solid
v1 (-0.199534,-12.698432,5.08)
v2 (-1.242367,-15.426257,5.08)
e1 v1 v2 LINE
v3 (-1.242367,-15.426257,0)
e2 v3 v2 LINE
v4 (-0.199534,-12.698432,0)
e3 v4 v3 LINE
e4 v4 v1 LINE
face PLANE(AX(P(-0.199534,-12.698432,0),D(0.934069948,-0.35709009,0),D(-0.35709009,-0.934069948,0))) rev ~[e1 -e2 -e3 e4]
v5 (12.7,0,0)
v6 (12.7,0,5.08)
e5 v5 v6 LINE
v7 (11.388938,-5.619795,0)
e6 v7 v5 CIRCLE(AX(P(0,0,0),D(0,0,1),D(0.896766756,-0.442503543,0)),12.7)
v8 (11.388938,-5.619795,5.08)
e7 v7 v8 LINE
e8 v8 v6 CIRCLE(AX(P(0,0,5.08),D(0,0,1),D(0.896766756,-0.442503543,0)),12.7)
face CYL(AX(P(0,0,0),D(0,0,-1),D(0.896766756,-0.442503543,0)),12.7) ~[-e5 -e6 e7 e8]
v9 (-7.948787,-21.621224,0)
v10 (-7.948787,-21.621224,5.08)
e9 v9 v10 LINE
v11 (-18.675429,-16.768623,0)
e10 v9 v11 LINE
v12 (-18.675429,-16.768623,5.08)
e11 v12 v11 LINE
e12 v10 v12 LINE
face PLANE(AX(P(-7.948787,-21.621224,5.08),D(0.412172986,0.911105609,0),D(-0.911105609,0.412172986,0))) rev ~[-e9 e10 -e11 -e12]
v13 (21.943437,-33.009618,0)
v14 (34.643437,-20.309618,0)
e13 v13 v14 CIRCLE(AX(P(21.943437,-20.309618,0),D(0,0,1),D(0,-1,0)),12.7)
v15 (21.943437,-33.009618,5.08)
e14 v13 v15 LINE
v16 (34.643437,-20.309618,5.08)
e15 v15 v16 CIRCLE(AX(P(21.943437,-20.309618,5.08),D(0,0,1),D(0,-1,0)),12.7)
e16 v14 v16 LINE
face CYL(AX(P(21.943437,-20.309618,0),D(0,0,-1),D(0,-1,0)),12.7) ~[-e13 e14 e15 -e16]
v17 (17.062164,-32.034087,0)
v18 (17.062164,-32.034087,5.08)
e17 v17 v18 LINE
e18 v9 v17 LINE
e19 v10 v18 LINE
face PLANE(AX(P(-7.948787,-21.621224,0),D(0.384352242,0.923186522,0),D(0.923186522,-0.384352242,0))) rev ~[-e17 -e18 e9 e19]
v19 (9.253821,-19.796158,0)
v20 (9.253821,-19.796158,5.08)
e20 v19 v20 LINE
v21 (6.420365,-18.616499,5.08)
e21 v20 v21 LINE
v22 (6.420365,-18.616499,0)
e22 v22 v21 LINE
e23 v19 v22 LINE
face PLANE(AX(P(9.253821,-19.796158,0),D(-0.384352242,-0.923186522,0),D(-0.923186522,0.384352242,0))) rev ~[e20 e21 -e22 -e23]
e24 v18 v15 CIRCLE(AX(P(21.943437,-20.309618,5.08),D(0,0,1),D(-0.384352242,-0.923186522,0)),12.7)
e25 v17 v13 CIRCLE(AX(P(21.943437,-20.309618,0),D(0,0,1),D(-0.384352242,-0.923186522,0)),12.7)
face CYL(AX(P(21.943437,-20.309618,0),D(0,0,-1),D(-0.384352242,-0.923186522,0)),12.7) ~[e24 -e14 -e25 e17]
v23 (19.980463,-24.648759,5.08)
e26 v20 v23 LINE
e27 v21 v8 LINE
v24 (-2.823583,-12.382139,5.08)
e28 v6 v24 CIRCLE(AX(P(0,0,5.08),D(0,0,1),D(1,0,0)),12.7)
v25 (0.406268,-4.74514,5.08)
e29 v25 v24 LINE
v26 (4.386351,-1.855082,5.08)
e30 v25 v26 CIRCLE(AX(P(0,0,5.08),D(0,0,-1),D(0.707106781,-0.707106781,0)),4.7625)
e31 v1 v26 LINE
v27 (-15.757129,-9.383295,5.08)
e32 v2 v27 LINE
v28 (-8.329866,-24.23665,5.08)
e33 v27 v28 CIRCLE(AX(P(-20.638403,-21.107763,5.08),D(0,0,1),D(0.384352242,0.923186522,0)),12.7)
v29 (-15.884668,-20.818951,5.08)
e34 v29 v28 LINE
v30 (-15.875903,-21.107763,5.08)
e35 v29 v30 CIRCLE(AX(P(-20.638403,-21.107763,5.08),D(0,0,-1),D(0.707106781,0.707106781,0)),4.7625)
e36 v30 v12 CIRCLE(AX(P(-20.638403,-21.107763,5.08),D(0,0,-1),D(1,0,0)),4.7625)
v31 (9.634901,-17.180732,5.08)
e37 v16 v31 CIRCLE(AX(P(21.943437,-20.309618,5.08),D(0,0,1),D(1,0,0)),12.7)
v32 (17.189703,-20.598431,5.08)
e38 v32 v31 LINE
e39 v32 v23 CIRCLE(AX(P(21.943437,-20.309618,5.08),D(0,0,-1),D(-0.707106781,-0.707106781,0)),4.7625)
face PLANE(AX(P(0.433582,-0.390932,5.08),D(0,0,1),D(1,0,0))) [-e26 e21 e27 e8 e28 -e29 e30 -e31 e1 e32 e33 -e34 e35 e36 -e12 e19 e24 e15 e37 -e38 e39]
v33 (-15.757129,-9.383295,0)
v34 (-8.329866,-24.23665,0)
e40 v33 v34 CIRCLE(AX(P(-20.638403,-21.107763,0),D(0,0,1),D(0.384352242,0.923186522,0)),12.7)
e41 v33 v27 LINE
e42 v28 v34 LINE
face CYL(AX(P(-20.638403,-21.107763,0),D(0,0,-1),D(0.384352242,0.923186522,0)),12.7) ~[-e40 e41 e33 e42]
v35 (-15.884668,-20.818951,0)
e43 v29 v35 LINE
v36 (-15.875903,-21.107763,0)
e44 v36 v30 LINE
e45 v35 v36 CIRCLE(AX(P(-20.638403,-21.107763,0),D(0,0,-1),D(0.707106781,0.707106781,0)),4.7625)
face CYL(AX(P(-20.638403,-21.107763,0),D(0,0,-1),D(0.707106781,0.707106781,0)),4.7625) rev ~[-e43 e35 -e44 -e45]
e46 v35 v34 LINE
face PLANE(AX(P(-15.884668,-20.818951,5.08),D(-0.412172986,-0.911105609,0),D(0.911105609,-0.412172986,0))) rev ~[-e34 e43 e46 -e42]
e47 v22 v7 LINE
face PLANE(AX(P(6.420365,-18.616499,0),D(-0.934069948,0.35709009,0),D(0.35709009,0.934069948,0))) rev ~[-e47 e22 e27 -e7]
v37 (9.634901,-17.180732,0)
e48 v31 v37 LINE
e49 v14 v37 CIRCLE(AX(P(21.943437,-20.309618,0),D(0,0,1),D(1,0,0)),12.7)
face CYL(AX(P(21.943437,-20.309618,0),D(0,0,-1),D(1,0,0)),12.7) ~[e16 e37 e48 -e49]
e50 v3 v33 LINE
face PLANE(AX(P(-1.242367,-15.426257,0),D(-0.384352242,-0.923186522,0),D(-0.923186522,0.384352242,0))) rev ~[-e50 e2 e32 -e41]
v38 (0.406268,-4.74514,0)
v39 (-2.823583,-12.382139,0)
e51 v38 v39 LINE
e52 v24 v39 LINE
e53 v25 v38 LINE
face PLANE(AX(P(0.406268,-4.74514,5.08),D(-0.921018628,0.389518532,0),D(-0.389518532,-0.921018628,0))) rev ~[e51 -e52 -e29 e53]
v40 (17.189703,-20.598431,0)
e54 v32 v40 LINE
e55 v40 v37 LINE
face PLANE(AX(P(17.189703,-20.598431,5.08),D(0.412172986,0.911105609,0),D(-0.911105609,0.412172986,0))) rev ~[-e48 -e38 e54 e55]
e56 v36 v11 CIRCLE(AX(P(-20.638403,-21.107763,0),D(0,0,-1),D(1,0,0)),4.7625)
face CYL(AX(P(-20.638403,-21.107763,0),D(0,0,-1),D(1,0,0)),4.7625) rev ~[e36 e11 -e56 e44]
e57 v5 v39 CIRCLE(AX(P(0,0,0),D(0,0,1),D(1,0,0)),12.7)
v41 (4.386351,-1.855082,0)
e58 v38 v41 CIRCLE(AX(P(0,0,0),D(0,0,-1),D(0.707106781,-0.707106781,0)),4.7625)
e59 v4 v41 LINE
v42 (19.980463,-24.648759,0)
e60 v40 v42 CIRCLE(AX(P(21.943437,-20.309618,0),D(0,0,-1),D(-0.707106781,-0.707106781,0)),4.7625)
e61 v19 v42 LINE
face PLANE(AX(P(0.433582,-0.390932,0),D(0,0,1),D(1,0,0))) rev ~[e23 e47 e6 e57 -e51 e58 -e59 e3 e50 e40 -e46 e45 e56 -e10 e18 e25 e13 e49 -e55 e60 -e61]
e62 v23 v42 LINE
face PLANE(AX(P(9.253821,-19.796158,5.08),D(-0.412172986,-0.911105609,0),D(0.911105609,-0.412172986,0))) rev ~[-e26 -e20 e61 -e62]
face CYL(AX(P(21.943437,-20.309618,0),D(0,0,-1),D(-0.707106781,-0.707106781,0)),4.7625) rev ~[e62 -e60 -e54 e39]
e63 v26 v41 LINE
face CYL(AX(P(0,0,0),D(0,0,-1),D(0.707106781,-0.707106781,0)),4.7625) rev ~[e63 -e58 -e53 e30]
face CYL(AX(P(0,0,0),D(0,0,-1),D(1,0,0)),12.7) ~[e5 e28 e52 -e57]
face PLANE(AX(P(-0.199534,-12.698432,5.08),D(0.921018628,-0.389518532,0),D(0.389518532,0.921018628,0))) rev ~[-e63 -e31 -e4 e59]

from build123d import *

# Parameters (mm, degrees)
F1_DEPTH = 5.08
F3_DEPTH = 25.4


# Not quite as in the source:
# - a feature names something its author has since deleted; it is built from what else it names


with BuildPart() as f1:
    # F0 (on Top) → F1 (new body)
    with BuildSketch(Plane.XY):
        with BuildLine():
            Line((6.7351920908, -6.7351920908), (8.9802561211, -8.9802561211))
            ThreePointArc((8.9802561211, -8.9802561211), (10.3222667059, -7.3987032683), (11.3889377966, -5.619795002))
            ThreePointArc((11.3889377966, -5.619795002), (12.3678921005, -2.8853500639), (12.7, 0))
            ThreePointArc((12.7, 0), (-8.9094308211, 9.0505271915), (-0.1995342432, -12.6984324263))
            Line((-0.1995342432, -12.6984324263), (0, -12.1764942784))
            Line((0, -12.1764942784), (0, -4.7625))
            ThreePointArc((0, -4.7625), (-3.3675960454, 3.3675960454), (4.7625, 0))
            ThreePointArc((4.7625, 0), (4.3999762736, -1.8225298466), (3.3675960454, -3.3675960454))
            Line((3.3675960454, -3.3675960454), (4.4901280605, -4.4901280605))
            Line((4.4901280605, -4.4901280605), (6.7351920908, -6.7351920908))
        make_face()
        with BuildLine():
            ThreePointArc((11.3889377966, -5.619795002), (10.3222667059, -7.3987032683), (8.9802561211, -8.9802561211))
            ThreePointArc((8.9802561211, -8.9802561211), (6.8924812287, -10.6669443849), (4.4968663349, -11.8772131902))
            Line((4.4968663349, -11.8772131902), (2.3084511304, -16.9045766677))
            Line((2.3084511304, -16.9045766677), (6.4203654177, -18.6164988404))
            Line((6.4203654177, -18.6164988404), (11.3889377966, -5.619795002))
        make_face()
        with BuildLine():
            Line((2.3084511304, -16.9045766677), (4.4968663349, -11.8772131902))
            ThreePointArc((4.4968663349, -11.8772131902), (2.2857594454, -12.4926099658), (0, -12.7))
            ThreePointArc((0, -12.7), (-0.0997702004, -12.6996081005), (-0.1995342432, -12.6984324263))
            Line((-0.1995342432, -12.6984324263), (-1.2423673122, -15.4262567422))
            Line((-1.2423673122, -15.4262567422), (2.3084511304, -16.9045766677))
        make_face()
        with BuildLine():
            Line((9.2538210972, -19.7961575745), (6.4203654177, -18.6164988404))
            Line((6.4203654177, -18.6164988404), (2.3084511304, -16.9045766677))
            Line((2.3084511304, -16.9045766677), (0.652517293, -20.7086908404))
            Line((0.652517293, -20.7086908404), (10.0662240577, -24.8064846655))
            ThreePointArc((10.0662240577, -24.8064846655), (9.4071650605, -22.3423208774), (9.2538210972, -19.7961575745))
        make_face()
        with BuildLine():
            ThreePointArc((-0.1995342432, -12.6984324263), (-0.0997702004, -12.6996081005), (0, -12.7))
            Line((0, -12.7), (0, -12.1764942784))
            Line((0, -12.1764942784), (-0.1995342432, -12.6984324263))
        make_face()
        with BuildLine():
            Line((0.652517293, -20.7086908404), (2.3084511304, -16.9045766677))
            Line((2.3084511304, -16.9045766677), (-1.2423673122, -15.4262567422))
            Line((-1.2423673122, -15.4262567422), (-15.757129186, -9.3832945241))
            ThreePointArc((-15.757129186, -9.3832945241), (-13.5731230118, -10.5544783892), (-11.6581465409, -12.1275072291))
            ThreePointArc((-11.6581465409, -12.1275072291), (-9.971458277, -14.2152821214), (-8.7611894717, -16.6108970152))
            Line((-8.7611894717, -16.6108970152), (0.652517293, -20.7086908404))
        make_face()
        with BuildLine():
            Line((18.5758412025, -23.677214376), (9.2538210972, -19.7961575745))
            ThreePointArc((9.2538210972, -19.7961575745), (9.4071650605, -22.3423208774), (10.0662240577, -24.8064846655))
            Line((10.0662240577, -24.8064846655), (15.2082451571, -27.0448104214))
            Line((15.2082451571, -27.0448104214), (17.4533091874, -24.7997463911))
            Line((17.4533091874, -24.7997463911), (18.5758412025, -23.677214376))
        make_face()
        with BuildLine():
            ThreePointArc((34.6434372479, -20.3096183306), (22.2002201194, -7.6122145583), (9.2538210972, -19.7961575745))
            Line((9.2538210972, -19.7961575745), (18.5758412025, -23.677214376))
            ThreePointArc((18.5758412025, -23.677214376), (20.1209074013, -15.909642057), (26.7059372479, -20.3096183306))
            ThreePointArc((26.7059372479, -20.3096183306), (25.3110332933, -23.677214376), (21.9434372479, -25.0721183306))
            Line((21.9434372479, -25.0721183306), (21.9434372479, -33.0096183306))
            ThreePointArc((21.9434372479, -33.0096183306), (30.923693369, -29.2898744517), (34.6434372479, -20.3096183306))
        make_face()
        with BuildLine():
            Line((10.0662240577, -24.8064846655), (0.652517293, -20.7086908404))
            Line((0.652517293, -20.7086908404), (-8.7611894717, -16.6108970152))
            ThreePointArc((-8.7611894717, -16.6108970152), (-8.1457926961, -18.8220039048), (-7.9384026619, -21.1077633501))
            ThreePointArc((-7.9384026619, -21.1077633501), (-7.9409988896, -21.3645462216), (-7.9487865112, -21.6212241063))
            Line((-7.9487865112, -21.6212241063), (17.062163772, -32.0340871567))
            ThreePointArc((17.062163772, -32.0340871567), (14.8781575978, -30.8629032915), (12.9631811269, -29.2898744517))
            ThreePointArc((12.9631811269, -29.2898744517), (11.276492863, -27.2020995593), (10.0662240577, -24.8064846655))
        make_face()
        with BuildLine():
            ThreePointArc((21.9434372479, -25.0721183306), (20.1209074013, -24.7095946042), (18.5758412025, -23.677214376))
            Line((18.5758412025, -23.677214376), (17.4533091874, -24.7997463911))
            Line((17.4533091874, -24.7997463911), (15.2082451571, -27.0448104214))
            Line((15.2082451571, -27.0448104214), (12.9631811269, -29.2898744517))
            ThreePointArc((12.9631811269, -29.2898744517), (14.8781575978, -30.8629032915), (17.062163772, -32.0340871567))
            ThreePointArc((17.062163772, -32.0340871567), (19.4545372993, -32.7633477739), (21.9434372479, -33.0096183306))
            Line((21.9434372479, -33.0096183306), (21.9434372479, -25.0721183306))
        make_face()
        with BuildLine():
            ThreePointArc((-11.6581465409, -12.1275072291), (-13.5731230118, -10.5544783892), (-15.757129186, -9.3832945241))
            ThreePointArc((-15.757129186, -9.3832945241), (-31.3447452065, -27.9388854628), (-7.9487865112, -21.6212241063))
            Line((-7.9487865112, -21.6212241063), (-9.1820824244, -21.1077633501))
            Line((-9.1820824244, -21.1077633501), (-15.8759026619, -21.1077633501))
            ThreePointArc((-15.8759026619, -21.1077633501), (-25.0383789355, -22.9302931968), (-17.2708066165, -17.7401673047))
            Line((-17.2708066165, -17.7401673047), (-16.1482746014, -16.6176352896))
            Line((-16.1482746014, -16.6176352896), (-13.9032105711, -14.3725712593))
            Line((-13.9032105711, -14.3725712593), (-11.6581465409, -12.1275072291))
        make_face()
        with BuildLine():
            Line((-9.1820824244, -21.1077633501), (-7.9487865112, -21.6212241063))
            ThreePointArc((-7.9487865112, -21.6212241063), (-7.9409988896, -21.3645462216), (-7.9384026619, -21.1077633501))
            Line((-7.9384026619, -21.1077633501), (-9.1820824244, -21.1077633501))
        make_face()
        with BuildLine():
            Line((15.2082451571, -27.0448104214), (10.0662240577, -24.8064846655))
            ThreePointArc((10.0662240577, -24.8064846655), (11.276492863, -27.2020995593), (12.9631811269, -29.2898744517))
            Line((12.9631811269, -29.2898744517), (15.2082451571, -27.0448104214))
        make_face()
        with BuildLine():
            ThreePointArc((0, -12.7), (2.2857594454, -12.4926099658), (4.4968663349, -11.8772131902))
            Line((4.4968663349, -11.8772131902), (6.7351920908, -6.7351920908))
            Line((6.7351920908, -6.7351920908), (4.4901280605, -4.4901280605))
            Line((4.4901280605, -4.4901280605), (3.3675960454, -3.3675960454))
            Line((3.3675960454, -3.3675960454), (0, -12.1764942784))
            Line((0, -12.1764942784), (0, -12.7))
        make_face()
        with BuildLine():
            Line((-15.8759026619, -21.1077633501), (-9.1820824244, -21.1077633501))
            Line((-9.1820824244, -21.1077633501), (-17.2708066165, -17.7401673047))
            ThreePointArc((-17.2708066165, -17.7401673047), (-16.2384263884, -19.2852335035), (-15.8759026619, -21.1077633501))
        make_face()
        with BuildLine():
            ThreePointArc((-7.9384026619, -21.1077633501), (-8.1457926961, -18.8220039048), (-8.7611894717, -16.6108970152))
            Line((-8.7611894717, -16.6108970152), (-13.9032105711, -14.3725712593))
            Line((-13.9032105711, -14.3725712593), (-16.1482746014, -16.6176352896))
            Line((-16.1482746014, -16.6176352896), (-17.2708066165, -17.7401673047))
            Line((-17.2708066165, -17.7401673047), (-9.1820824244, -21.1077633501))
            Line((-9.1820824244, -21.1077633501), (-7.9384026619, -21.1077633501))
        make_face()
        with BuildLine():
            Line((0, -4.7625), (0, -12.1764942784))
            Line((0, -12.1764942784), (3.3675960454, -3.3675960454))
            ThreePointArc((3.3675960454, -3.3675960454), (1.8225298466, -4.3999762736), (0, -4.7625))
        make_face()
        with BuildLine():
            Line((-13.9032105711, -14.3725712593), (-8.7611894717, -16.6108970152))
            ThreePointArc((-8.7611894717, -16.6108970152), (-9.971458277, -14.2152821214), (-11.6581465409, -12.1275072291))
            Line((-11.6581465409, -12.1275072291), (-13.9032105711, -14.3725712593))
        make_face()
        with BuildLine():
            ThreePointArc((4.4968663349, -11.8772131902), (6.8924812287, -10.6669443849), (8.9802561211, -8.9802561211))
            Line((8.9802561211, -8.9802561211), (6.7351920908, -6.7351920908))
            Line((6.7351920908, -6.7351920908), (4.4968663349, -11.8772131902))
        make_face()
    extrude(amount=F1_DEPTH)

    # F2 (on face) → F3 (cut)
    with BuildSketch(Plane.XY.offset(5.08)):
        with BuildLine():
            Line((-15.8846679825, -20.8189505253), (-8.3298662663, -24.2366500209))
            ThreePointArc((-8.3298662663, -24.2366500209), (-8.0711029973, -22.9388775299), (-7.9487865112, -21.6212241063))
            Line((-7.9487865112, -21.6212241063), (-18.6754288181, -16.7686228893))
            ThreePointArc((-18.6754288181, -16.7686228893), (-16.7166897918, -18.4056207903), (-15.8846679825, -20.8189505253))
        make_face()
        with BuildLine():
            ThreePointArc((-2.823583262, -12.3821394582), (-1.5198092555, -12.6087342674), (-0.1995342432, -12.6984324263))
            Line((-0.1995342432, -12.6984324263), (4.3863512165, -1.8550820077))
            ThreePointArc((4.3863512165, -1.8550820077), (2.7982865403, -3.8536993511), (0.406267641, -4.7451399193))
            Line((0.406267641, -4.7451399193), (-2.823583262, -12.3821394582))
        make_face()
        with BuildLine():
            ThreePointArc((9.6349008523, -17.1807316599), (9.3761375833, -18.4785041508), (9.2538210972, -19.7961575745))
            Line((9.2538210972, -19.7961575745), (19.9804634041, -24.6487587914))
            ThreePointArc((19.9804634041, -24.6487587914), (18.0217243778, -23.0117608905), (17.1897025685, -20.5984311555))
            Line((17.1897025685, -20.5984311555), (9.6349008523, -17.1807316599))
        make_face()
    extrude(amount=-F3_DEPTH, mode=Mode.SUBTRACT)


solid = f1.part
